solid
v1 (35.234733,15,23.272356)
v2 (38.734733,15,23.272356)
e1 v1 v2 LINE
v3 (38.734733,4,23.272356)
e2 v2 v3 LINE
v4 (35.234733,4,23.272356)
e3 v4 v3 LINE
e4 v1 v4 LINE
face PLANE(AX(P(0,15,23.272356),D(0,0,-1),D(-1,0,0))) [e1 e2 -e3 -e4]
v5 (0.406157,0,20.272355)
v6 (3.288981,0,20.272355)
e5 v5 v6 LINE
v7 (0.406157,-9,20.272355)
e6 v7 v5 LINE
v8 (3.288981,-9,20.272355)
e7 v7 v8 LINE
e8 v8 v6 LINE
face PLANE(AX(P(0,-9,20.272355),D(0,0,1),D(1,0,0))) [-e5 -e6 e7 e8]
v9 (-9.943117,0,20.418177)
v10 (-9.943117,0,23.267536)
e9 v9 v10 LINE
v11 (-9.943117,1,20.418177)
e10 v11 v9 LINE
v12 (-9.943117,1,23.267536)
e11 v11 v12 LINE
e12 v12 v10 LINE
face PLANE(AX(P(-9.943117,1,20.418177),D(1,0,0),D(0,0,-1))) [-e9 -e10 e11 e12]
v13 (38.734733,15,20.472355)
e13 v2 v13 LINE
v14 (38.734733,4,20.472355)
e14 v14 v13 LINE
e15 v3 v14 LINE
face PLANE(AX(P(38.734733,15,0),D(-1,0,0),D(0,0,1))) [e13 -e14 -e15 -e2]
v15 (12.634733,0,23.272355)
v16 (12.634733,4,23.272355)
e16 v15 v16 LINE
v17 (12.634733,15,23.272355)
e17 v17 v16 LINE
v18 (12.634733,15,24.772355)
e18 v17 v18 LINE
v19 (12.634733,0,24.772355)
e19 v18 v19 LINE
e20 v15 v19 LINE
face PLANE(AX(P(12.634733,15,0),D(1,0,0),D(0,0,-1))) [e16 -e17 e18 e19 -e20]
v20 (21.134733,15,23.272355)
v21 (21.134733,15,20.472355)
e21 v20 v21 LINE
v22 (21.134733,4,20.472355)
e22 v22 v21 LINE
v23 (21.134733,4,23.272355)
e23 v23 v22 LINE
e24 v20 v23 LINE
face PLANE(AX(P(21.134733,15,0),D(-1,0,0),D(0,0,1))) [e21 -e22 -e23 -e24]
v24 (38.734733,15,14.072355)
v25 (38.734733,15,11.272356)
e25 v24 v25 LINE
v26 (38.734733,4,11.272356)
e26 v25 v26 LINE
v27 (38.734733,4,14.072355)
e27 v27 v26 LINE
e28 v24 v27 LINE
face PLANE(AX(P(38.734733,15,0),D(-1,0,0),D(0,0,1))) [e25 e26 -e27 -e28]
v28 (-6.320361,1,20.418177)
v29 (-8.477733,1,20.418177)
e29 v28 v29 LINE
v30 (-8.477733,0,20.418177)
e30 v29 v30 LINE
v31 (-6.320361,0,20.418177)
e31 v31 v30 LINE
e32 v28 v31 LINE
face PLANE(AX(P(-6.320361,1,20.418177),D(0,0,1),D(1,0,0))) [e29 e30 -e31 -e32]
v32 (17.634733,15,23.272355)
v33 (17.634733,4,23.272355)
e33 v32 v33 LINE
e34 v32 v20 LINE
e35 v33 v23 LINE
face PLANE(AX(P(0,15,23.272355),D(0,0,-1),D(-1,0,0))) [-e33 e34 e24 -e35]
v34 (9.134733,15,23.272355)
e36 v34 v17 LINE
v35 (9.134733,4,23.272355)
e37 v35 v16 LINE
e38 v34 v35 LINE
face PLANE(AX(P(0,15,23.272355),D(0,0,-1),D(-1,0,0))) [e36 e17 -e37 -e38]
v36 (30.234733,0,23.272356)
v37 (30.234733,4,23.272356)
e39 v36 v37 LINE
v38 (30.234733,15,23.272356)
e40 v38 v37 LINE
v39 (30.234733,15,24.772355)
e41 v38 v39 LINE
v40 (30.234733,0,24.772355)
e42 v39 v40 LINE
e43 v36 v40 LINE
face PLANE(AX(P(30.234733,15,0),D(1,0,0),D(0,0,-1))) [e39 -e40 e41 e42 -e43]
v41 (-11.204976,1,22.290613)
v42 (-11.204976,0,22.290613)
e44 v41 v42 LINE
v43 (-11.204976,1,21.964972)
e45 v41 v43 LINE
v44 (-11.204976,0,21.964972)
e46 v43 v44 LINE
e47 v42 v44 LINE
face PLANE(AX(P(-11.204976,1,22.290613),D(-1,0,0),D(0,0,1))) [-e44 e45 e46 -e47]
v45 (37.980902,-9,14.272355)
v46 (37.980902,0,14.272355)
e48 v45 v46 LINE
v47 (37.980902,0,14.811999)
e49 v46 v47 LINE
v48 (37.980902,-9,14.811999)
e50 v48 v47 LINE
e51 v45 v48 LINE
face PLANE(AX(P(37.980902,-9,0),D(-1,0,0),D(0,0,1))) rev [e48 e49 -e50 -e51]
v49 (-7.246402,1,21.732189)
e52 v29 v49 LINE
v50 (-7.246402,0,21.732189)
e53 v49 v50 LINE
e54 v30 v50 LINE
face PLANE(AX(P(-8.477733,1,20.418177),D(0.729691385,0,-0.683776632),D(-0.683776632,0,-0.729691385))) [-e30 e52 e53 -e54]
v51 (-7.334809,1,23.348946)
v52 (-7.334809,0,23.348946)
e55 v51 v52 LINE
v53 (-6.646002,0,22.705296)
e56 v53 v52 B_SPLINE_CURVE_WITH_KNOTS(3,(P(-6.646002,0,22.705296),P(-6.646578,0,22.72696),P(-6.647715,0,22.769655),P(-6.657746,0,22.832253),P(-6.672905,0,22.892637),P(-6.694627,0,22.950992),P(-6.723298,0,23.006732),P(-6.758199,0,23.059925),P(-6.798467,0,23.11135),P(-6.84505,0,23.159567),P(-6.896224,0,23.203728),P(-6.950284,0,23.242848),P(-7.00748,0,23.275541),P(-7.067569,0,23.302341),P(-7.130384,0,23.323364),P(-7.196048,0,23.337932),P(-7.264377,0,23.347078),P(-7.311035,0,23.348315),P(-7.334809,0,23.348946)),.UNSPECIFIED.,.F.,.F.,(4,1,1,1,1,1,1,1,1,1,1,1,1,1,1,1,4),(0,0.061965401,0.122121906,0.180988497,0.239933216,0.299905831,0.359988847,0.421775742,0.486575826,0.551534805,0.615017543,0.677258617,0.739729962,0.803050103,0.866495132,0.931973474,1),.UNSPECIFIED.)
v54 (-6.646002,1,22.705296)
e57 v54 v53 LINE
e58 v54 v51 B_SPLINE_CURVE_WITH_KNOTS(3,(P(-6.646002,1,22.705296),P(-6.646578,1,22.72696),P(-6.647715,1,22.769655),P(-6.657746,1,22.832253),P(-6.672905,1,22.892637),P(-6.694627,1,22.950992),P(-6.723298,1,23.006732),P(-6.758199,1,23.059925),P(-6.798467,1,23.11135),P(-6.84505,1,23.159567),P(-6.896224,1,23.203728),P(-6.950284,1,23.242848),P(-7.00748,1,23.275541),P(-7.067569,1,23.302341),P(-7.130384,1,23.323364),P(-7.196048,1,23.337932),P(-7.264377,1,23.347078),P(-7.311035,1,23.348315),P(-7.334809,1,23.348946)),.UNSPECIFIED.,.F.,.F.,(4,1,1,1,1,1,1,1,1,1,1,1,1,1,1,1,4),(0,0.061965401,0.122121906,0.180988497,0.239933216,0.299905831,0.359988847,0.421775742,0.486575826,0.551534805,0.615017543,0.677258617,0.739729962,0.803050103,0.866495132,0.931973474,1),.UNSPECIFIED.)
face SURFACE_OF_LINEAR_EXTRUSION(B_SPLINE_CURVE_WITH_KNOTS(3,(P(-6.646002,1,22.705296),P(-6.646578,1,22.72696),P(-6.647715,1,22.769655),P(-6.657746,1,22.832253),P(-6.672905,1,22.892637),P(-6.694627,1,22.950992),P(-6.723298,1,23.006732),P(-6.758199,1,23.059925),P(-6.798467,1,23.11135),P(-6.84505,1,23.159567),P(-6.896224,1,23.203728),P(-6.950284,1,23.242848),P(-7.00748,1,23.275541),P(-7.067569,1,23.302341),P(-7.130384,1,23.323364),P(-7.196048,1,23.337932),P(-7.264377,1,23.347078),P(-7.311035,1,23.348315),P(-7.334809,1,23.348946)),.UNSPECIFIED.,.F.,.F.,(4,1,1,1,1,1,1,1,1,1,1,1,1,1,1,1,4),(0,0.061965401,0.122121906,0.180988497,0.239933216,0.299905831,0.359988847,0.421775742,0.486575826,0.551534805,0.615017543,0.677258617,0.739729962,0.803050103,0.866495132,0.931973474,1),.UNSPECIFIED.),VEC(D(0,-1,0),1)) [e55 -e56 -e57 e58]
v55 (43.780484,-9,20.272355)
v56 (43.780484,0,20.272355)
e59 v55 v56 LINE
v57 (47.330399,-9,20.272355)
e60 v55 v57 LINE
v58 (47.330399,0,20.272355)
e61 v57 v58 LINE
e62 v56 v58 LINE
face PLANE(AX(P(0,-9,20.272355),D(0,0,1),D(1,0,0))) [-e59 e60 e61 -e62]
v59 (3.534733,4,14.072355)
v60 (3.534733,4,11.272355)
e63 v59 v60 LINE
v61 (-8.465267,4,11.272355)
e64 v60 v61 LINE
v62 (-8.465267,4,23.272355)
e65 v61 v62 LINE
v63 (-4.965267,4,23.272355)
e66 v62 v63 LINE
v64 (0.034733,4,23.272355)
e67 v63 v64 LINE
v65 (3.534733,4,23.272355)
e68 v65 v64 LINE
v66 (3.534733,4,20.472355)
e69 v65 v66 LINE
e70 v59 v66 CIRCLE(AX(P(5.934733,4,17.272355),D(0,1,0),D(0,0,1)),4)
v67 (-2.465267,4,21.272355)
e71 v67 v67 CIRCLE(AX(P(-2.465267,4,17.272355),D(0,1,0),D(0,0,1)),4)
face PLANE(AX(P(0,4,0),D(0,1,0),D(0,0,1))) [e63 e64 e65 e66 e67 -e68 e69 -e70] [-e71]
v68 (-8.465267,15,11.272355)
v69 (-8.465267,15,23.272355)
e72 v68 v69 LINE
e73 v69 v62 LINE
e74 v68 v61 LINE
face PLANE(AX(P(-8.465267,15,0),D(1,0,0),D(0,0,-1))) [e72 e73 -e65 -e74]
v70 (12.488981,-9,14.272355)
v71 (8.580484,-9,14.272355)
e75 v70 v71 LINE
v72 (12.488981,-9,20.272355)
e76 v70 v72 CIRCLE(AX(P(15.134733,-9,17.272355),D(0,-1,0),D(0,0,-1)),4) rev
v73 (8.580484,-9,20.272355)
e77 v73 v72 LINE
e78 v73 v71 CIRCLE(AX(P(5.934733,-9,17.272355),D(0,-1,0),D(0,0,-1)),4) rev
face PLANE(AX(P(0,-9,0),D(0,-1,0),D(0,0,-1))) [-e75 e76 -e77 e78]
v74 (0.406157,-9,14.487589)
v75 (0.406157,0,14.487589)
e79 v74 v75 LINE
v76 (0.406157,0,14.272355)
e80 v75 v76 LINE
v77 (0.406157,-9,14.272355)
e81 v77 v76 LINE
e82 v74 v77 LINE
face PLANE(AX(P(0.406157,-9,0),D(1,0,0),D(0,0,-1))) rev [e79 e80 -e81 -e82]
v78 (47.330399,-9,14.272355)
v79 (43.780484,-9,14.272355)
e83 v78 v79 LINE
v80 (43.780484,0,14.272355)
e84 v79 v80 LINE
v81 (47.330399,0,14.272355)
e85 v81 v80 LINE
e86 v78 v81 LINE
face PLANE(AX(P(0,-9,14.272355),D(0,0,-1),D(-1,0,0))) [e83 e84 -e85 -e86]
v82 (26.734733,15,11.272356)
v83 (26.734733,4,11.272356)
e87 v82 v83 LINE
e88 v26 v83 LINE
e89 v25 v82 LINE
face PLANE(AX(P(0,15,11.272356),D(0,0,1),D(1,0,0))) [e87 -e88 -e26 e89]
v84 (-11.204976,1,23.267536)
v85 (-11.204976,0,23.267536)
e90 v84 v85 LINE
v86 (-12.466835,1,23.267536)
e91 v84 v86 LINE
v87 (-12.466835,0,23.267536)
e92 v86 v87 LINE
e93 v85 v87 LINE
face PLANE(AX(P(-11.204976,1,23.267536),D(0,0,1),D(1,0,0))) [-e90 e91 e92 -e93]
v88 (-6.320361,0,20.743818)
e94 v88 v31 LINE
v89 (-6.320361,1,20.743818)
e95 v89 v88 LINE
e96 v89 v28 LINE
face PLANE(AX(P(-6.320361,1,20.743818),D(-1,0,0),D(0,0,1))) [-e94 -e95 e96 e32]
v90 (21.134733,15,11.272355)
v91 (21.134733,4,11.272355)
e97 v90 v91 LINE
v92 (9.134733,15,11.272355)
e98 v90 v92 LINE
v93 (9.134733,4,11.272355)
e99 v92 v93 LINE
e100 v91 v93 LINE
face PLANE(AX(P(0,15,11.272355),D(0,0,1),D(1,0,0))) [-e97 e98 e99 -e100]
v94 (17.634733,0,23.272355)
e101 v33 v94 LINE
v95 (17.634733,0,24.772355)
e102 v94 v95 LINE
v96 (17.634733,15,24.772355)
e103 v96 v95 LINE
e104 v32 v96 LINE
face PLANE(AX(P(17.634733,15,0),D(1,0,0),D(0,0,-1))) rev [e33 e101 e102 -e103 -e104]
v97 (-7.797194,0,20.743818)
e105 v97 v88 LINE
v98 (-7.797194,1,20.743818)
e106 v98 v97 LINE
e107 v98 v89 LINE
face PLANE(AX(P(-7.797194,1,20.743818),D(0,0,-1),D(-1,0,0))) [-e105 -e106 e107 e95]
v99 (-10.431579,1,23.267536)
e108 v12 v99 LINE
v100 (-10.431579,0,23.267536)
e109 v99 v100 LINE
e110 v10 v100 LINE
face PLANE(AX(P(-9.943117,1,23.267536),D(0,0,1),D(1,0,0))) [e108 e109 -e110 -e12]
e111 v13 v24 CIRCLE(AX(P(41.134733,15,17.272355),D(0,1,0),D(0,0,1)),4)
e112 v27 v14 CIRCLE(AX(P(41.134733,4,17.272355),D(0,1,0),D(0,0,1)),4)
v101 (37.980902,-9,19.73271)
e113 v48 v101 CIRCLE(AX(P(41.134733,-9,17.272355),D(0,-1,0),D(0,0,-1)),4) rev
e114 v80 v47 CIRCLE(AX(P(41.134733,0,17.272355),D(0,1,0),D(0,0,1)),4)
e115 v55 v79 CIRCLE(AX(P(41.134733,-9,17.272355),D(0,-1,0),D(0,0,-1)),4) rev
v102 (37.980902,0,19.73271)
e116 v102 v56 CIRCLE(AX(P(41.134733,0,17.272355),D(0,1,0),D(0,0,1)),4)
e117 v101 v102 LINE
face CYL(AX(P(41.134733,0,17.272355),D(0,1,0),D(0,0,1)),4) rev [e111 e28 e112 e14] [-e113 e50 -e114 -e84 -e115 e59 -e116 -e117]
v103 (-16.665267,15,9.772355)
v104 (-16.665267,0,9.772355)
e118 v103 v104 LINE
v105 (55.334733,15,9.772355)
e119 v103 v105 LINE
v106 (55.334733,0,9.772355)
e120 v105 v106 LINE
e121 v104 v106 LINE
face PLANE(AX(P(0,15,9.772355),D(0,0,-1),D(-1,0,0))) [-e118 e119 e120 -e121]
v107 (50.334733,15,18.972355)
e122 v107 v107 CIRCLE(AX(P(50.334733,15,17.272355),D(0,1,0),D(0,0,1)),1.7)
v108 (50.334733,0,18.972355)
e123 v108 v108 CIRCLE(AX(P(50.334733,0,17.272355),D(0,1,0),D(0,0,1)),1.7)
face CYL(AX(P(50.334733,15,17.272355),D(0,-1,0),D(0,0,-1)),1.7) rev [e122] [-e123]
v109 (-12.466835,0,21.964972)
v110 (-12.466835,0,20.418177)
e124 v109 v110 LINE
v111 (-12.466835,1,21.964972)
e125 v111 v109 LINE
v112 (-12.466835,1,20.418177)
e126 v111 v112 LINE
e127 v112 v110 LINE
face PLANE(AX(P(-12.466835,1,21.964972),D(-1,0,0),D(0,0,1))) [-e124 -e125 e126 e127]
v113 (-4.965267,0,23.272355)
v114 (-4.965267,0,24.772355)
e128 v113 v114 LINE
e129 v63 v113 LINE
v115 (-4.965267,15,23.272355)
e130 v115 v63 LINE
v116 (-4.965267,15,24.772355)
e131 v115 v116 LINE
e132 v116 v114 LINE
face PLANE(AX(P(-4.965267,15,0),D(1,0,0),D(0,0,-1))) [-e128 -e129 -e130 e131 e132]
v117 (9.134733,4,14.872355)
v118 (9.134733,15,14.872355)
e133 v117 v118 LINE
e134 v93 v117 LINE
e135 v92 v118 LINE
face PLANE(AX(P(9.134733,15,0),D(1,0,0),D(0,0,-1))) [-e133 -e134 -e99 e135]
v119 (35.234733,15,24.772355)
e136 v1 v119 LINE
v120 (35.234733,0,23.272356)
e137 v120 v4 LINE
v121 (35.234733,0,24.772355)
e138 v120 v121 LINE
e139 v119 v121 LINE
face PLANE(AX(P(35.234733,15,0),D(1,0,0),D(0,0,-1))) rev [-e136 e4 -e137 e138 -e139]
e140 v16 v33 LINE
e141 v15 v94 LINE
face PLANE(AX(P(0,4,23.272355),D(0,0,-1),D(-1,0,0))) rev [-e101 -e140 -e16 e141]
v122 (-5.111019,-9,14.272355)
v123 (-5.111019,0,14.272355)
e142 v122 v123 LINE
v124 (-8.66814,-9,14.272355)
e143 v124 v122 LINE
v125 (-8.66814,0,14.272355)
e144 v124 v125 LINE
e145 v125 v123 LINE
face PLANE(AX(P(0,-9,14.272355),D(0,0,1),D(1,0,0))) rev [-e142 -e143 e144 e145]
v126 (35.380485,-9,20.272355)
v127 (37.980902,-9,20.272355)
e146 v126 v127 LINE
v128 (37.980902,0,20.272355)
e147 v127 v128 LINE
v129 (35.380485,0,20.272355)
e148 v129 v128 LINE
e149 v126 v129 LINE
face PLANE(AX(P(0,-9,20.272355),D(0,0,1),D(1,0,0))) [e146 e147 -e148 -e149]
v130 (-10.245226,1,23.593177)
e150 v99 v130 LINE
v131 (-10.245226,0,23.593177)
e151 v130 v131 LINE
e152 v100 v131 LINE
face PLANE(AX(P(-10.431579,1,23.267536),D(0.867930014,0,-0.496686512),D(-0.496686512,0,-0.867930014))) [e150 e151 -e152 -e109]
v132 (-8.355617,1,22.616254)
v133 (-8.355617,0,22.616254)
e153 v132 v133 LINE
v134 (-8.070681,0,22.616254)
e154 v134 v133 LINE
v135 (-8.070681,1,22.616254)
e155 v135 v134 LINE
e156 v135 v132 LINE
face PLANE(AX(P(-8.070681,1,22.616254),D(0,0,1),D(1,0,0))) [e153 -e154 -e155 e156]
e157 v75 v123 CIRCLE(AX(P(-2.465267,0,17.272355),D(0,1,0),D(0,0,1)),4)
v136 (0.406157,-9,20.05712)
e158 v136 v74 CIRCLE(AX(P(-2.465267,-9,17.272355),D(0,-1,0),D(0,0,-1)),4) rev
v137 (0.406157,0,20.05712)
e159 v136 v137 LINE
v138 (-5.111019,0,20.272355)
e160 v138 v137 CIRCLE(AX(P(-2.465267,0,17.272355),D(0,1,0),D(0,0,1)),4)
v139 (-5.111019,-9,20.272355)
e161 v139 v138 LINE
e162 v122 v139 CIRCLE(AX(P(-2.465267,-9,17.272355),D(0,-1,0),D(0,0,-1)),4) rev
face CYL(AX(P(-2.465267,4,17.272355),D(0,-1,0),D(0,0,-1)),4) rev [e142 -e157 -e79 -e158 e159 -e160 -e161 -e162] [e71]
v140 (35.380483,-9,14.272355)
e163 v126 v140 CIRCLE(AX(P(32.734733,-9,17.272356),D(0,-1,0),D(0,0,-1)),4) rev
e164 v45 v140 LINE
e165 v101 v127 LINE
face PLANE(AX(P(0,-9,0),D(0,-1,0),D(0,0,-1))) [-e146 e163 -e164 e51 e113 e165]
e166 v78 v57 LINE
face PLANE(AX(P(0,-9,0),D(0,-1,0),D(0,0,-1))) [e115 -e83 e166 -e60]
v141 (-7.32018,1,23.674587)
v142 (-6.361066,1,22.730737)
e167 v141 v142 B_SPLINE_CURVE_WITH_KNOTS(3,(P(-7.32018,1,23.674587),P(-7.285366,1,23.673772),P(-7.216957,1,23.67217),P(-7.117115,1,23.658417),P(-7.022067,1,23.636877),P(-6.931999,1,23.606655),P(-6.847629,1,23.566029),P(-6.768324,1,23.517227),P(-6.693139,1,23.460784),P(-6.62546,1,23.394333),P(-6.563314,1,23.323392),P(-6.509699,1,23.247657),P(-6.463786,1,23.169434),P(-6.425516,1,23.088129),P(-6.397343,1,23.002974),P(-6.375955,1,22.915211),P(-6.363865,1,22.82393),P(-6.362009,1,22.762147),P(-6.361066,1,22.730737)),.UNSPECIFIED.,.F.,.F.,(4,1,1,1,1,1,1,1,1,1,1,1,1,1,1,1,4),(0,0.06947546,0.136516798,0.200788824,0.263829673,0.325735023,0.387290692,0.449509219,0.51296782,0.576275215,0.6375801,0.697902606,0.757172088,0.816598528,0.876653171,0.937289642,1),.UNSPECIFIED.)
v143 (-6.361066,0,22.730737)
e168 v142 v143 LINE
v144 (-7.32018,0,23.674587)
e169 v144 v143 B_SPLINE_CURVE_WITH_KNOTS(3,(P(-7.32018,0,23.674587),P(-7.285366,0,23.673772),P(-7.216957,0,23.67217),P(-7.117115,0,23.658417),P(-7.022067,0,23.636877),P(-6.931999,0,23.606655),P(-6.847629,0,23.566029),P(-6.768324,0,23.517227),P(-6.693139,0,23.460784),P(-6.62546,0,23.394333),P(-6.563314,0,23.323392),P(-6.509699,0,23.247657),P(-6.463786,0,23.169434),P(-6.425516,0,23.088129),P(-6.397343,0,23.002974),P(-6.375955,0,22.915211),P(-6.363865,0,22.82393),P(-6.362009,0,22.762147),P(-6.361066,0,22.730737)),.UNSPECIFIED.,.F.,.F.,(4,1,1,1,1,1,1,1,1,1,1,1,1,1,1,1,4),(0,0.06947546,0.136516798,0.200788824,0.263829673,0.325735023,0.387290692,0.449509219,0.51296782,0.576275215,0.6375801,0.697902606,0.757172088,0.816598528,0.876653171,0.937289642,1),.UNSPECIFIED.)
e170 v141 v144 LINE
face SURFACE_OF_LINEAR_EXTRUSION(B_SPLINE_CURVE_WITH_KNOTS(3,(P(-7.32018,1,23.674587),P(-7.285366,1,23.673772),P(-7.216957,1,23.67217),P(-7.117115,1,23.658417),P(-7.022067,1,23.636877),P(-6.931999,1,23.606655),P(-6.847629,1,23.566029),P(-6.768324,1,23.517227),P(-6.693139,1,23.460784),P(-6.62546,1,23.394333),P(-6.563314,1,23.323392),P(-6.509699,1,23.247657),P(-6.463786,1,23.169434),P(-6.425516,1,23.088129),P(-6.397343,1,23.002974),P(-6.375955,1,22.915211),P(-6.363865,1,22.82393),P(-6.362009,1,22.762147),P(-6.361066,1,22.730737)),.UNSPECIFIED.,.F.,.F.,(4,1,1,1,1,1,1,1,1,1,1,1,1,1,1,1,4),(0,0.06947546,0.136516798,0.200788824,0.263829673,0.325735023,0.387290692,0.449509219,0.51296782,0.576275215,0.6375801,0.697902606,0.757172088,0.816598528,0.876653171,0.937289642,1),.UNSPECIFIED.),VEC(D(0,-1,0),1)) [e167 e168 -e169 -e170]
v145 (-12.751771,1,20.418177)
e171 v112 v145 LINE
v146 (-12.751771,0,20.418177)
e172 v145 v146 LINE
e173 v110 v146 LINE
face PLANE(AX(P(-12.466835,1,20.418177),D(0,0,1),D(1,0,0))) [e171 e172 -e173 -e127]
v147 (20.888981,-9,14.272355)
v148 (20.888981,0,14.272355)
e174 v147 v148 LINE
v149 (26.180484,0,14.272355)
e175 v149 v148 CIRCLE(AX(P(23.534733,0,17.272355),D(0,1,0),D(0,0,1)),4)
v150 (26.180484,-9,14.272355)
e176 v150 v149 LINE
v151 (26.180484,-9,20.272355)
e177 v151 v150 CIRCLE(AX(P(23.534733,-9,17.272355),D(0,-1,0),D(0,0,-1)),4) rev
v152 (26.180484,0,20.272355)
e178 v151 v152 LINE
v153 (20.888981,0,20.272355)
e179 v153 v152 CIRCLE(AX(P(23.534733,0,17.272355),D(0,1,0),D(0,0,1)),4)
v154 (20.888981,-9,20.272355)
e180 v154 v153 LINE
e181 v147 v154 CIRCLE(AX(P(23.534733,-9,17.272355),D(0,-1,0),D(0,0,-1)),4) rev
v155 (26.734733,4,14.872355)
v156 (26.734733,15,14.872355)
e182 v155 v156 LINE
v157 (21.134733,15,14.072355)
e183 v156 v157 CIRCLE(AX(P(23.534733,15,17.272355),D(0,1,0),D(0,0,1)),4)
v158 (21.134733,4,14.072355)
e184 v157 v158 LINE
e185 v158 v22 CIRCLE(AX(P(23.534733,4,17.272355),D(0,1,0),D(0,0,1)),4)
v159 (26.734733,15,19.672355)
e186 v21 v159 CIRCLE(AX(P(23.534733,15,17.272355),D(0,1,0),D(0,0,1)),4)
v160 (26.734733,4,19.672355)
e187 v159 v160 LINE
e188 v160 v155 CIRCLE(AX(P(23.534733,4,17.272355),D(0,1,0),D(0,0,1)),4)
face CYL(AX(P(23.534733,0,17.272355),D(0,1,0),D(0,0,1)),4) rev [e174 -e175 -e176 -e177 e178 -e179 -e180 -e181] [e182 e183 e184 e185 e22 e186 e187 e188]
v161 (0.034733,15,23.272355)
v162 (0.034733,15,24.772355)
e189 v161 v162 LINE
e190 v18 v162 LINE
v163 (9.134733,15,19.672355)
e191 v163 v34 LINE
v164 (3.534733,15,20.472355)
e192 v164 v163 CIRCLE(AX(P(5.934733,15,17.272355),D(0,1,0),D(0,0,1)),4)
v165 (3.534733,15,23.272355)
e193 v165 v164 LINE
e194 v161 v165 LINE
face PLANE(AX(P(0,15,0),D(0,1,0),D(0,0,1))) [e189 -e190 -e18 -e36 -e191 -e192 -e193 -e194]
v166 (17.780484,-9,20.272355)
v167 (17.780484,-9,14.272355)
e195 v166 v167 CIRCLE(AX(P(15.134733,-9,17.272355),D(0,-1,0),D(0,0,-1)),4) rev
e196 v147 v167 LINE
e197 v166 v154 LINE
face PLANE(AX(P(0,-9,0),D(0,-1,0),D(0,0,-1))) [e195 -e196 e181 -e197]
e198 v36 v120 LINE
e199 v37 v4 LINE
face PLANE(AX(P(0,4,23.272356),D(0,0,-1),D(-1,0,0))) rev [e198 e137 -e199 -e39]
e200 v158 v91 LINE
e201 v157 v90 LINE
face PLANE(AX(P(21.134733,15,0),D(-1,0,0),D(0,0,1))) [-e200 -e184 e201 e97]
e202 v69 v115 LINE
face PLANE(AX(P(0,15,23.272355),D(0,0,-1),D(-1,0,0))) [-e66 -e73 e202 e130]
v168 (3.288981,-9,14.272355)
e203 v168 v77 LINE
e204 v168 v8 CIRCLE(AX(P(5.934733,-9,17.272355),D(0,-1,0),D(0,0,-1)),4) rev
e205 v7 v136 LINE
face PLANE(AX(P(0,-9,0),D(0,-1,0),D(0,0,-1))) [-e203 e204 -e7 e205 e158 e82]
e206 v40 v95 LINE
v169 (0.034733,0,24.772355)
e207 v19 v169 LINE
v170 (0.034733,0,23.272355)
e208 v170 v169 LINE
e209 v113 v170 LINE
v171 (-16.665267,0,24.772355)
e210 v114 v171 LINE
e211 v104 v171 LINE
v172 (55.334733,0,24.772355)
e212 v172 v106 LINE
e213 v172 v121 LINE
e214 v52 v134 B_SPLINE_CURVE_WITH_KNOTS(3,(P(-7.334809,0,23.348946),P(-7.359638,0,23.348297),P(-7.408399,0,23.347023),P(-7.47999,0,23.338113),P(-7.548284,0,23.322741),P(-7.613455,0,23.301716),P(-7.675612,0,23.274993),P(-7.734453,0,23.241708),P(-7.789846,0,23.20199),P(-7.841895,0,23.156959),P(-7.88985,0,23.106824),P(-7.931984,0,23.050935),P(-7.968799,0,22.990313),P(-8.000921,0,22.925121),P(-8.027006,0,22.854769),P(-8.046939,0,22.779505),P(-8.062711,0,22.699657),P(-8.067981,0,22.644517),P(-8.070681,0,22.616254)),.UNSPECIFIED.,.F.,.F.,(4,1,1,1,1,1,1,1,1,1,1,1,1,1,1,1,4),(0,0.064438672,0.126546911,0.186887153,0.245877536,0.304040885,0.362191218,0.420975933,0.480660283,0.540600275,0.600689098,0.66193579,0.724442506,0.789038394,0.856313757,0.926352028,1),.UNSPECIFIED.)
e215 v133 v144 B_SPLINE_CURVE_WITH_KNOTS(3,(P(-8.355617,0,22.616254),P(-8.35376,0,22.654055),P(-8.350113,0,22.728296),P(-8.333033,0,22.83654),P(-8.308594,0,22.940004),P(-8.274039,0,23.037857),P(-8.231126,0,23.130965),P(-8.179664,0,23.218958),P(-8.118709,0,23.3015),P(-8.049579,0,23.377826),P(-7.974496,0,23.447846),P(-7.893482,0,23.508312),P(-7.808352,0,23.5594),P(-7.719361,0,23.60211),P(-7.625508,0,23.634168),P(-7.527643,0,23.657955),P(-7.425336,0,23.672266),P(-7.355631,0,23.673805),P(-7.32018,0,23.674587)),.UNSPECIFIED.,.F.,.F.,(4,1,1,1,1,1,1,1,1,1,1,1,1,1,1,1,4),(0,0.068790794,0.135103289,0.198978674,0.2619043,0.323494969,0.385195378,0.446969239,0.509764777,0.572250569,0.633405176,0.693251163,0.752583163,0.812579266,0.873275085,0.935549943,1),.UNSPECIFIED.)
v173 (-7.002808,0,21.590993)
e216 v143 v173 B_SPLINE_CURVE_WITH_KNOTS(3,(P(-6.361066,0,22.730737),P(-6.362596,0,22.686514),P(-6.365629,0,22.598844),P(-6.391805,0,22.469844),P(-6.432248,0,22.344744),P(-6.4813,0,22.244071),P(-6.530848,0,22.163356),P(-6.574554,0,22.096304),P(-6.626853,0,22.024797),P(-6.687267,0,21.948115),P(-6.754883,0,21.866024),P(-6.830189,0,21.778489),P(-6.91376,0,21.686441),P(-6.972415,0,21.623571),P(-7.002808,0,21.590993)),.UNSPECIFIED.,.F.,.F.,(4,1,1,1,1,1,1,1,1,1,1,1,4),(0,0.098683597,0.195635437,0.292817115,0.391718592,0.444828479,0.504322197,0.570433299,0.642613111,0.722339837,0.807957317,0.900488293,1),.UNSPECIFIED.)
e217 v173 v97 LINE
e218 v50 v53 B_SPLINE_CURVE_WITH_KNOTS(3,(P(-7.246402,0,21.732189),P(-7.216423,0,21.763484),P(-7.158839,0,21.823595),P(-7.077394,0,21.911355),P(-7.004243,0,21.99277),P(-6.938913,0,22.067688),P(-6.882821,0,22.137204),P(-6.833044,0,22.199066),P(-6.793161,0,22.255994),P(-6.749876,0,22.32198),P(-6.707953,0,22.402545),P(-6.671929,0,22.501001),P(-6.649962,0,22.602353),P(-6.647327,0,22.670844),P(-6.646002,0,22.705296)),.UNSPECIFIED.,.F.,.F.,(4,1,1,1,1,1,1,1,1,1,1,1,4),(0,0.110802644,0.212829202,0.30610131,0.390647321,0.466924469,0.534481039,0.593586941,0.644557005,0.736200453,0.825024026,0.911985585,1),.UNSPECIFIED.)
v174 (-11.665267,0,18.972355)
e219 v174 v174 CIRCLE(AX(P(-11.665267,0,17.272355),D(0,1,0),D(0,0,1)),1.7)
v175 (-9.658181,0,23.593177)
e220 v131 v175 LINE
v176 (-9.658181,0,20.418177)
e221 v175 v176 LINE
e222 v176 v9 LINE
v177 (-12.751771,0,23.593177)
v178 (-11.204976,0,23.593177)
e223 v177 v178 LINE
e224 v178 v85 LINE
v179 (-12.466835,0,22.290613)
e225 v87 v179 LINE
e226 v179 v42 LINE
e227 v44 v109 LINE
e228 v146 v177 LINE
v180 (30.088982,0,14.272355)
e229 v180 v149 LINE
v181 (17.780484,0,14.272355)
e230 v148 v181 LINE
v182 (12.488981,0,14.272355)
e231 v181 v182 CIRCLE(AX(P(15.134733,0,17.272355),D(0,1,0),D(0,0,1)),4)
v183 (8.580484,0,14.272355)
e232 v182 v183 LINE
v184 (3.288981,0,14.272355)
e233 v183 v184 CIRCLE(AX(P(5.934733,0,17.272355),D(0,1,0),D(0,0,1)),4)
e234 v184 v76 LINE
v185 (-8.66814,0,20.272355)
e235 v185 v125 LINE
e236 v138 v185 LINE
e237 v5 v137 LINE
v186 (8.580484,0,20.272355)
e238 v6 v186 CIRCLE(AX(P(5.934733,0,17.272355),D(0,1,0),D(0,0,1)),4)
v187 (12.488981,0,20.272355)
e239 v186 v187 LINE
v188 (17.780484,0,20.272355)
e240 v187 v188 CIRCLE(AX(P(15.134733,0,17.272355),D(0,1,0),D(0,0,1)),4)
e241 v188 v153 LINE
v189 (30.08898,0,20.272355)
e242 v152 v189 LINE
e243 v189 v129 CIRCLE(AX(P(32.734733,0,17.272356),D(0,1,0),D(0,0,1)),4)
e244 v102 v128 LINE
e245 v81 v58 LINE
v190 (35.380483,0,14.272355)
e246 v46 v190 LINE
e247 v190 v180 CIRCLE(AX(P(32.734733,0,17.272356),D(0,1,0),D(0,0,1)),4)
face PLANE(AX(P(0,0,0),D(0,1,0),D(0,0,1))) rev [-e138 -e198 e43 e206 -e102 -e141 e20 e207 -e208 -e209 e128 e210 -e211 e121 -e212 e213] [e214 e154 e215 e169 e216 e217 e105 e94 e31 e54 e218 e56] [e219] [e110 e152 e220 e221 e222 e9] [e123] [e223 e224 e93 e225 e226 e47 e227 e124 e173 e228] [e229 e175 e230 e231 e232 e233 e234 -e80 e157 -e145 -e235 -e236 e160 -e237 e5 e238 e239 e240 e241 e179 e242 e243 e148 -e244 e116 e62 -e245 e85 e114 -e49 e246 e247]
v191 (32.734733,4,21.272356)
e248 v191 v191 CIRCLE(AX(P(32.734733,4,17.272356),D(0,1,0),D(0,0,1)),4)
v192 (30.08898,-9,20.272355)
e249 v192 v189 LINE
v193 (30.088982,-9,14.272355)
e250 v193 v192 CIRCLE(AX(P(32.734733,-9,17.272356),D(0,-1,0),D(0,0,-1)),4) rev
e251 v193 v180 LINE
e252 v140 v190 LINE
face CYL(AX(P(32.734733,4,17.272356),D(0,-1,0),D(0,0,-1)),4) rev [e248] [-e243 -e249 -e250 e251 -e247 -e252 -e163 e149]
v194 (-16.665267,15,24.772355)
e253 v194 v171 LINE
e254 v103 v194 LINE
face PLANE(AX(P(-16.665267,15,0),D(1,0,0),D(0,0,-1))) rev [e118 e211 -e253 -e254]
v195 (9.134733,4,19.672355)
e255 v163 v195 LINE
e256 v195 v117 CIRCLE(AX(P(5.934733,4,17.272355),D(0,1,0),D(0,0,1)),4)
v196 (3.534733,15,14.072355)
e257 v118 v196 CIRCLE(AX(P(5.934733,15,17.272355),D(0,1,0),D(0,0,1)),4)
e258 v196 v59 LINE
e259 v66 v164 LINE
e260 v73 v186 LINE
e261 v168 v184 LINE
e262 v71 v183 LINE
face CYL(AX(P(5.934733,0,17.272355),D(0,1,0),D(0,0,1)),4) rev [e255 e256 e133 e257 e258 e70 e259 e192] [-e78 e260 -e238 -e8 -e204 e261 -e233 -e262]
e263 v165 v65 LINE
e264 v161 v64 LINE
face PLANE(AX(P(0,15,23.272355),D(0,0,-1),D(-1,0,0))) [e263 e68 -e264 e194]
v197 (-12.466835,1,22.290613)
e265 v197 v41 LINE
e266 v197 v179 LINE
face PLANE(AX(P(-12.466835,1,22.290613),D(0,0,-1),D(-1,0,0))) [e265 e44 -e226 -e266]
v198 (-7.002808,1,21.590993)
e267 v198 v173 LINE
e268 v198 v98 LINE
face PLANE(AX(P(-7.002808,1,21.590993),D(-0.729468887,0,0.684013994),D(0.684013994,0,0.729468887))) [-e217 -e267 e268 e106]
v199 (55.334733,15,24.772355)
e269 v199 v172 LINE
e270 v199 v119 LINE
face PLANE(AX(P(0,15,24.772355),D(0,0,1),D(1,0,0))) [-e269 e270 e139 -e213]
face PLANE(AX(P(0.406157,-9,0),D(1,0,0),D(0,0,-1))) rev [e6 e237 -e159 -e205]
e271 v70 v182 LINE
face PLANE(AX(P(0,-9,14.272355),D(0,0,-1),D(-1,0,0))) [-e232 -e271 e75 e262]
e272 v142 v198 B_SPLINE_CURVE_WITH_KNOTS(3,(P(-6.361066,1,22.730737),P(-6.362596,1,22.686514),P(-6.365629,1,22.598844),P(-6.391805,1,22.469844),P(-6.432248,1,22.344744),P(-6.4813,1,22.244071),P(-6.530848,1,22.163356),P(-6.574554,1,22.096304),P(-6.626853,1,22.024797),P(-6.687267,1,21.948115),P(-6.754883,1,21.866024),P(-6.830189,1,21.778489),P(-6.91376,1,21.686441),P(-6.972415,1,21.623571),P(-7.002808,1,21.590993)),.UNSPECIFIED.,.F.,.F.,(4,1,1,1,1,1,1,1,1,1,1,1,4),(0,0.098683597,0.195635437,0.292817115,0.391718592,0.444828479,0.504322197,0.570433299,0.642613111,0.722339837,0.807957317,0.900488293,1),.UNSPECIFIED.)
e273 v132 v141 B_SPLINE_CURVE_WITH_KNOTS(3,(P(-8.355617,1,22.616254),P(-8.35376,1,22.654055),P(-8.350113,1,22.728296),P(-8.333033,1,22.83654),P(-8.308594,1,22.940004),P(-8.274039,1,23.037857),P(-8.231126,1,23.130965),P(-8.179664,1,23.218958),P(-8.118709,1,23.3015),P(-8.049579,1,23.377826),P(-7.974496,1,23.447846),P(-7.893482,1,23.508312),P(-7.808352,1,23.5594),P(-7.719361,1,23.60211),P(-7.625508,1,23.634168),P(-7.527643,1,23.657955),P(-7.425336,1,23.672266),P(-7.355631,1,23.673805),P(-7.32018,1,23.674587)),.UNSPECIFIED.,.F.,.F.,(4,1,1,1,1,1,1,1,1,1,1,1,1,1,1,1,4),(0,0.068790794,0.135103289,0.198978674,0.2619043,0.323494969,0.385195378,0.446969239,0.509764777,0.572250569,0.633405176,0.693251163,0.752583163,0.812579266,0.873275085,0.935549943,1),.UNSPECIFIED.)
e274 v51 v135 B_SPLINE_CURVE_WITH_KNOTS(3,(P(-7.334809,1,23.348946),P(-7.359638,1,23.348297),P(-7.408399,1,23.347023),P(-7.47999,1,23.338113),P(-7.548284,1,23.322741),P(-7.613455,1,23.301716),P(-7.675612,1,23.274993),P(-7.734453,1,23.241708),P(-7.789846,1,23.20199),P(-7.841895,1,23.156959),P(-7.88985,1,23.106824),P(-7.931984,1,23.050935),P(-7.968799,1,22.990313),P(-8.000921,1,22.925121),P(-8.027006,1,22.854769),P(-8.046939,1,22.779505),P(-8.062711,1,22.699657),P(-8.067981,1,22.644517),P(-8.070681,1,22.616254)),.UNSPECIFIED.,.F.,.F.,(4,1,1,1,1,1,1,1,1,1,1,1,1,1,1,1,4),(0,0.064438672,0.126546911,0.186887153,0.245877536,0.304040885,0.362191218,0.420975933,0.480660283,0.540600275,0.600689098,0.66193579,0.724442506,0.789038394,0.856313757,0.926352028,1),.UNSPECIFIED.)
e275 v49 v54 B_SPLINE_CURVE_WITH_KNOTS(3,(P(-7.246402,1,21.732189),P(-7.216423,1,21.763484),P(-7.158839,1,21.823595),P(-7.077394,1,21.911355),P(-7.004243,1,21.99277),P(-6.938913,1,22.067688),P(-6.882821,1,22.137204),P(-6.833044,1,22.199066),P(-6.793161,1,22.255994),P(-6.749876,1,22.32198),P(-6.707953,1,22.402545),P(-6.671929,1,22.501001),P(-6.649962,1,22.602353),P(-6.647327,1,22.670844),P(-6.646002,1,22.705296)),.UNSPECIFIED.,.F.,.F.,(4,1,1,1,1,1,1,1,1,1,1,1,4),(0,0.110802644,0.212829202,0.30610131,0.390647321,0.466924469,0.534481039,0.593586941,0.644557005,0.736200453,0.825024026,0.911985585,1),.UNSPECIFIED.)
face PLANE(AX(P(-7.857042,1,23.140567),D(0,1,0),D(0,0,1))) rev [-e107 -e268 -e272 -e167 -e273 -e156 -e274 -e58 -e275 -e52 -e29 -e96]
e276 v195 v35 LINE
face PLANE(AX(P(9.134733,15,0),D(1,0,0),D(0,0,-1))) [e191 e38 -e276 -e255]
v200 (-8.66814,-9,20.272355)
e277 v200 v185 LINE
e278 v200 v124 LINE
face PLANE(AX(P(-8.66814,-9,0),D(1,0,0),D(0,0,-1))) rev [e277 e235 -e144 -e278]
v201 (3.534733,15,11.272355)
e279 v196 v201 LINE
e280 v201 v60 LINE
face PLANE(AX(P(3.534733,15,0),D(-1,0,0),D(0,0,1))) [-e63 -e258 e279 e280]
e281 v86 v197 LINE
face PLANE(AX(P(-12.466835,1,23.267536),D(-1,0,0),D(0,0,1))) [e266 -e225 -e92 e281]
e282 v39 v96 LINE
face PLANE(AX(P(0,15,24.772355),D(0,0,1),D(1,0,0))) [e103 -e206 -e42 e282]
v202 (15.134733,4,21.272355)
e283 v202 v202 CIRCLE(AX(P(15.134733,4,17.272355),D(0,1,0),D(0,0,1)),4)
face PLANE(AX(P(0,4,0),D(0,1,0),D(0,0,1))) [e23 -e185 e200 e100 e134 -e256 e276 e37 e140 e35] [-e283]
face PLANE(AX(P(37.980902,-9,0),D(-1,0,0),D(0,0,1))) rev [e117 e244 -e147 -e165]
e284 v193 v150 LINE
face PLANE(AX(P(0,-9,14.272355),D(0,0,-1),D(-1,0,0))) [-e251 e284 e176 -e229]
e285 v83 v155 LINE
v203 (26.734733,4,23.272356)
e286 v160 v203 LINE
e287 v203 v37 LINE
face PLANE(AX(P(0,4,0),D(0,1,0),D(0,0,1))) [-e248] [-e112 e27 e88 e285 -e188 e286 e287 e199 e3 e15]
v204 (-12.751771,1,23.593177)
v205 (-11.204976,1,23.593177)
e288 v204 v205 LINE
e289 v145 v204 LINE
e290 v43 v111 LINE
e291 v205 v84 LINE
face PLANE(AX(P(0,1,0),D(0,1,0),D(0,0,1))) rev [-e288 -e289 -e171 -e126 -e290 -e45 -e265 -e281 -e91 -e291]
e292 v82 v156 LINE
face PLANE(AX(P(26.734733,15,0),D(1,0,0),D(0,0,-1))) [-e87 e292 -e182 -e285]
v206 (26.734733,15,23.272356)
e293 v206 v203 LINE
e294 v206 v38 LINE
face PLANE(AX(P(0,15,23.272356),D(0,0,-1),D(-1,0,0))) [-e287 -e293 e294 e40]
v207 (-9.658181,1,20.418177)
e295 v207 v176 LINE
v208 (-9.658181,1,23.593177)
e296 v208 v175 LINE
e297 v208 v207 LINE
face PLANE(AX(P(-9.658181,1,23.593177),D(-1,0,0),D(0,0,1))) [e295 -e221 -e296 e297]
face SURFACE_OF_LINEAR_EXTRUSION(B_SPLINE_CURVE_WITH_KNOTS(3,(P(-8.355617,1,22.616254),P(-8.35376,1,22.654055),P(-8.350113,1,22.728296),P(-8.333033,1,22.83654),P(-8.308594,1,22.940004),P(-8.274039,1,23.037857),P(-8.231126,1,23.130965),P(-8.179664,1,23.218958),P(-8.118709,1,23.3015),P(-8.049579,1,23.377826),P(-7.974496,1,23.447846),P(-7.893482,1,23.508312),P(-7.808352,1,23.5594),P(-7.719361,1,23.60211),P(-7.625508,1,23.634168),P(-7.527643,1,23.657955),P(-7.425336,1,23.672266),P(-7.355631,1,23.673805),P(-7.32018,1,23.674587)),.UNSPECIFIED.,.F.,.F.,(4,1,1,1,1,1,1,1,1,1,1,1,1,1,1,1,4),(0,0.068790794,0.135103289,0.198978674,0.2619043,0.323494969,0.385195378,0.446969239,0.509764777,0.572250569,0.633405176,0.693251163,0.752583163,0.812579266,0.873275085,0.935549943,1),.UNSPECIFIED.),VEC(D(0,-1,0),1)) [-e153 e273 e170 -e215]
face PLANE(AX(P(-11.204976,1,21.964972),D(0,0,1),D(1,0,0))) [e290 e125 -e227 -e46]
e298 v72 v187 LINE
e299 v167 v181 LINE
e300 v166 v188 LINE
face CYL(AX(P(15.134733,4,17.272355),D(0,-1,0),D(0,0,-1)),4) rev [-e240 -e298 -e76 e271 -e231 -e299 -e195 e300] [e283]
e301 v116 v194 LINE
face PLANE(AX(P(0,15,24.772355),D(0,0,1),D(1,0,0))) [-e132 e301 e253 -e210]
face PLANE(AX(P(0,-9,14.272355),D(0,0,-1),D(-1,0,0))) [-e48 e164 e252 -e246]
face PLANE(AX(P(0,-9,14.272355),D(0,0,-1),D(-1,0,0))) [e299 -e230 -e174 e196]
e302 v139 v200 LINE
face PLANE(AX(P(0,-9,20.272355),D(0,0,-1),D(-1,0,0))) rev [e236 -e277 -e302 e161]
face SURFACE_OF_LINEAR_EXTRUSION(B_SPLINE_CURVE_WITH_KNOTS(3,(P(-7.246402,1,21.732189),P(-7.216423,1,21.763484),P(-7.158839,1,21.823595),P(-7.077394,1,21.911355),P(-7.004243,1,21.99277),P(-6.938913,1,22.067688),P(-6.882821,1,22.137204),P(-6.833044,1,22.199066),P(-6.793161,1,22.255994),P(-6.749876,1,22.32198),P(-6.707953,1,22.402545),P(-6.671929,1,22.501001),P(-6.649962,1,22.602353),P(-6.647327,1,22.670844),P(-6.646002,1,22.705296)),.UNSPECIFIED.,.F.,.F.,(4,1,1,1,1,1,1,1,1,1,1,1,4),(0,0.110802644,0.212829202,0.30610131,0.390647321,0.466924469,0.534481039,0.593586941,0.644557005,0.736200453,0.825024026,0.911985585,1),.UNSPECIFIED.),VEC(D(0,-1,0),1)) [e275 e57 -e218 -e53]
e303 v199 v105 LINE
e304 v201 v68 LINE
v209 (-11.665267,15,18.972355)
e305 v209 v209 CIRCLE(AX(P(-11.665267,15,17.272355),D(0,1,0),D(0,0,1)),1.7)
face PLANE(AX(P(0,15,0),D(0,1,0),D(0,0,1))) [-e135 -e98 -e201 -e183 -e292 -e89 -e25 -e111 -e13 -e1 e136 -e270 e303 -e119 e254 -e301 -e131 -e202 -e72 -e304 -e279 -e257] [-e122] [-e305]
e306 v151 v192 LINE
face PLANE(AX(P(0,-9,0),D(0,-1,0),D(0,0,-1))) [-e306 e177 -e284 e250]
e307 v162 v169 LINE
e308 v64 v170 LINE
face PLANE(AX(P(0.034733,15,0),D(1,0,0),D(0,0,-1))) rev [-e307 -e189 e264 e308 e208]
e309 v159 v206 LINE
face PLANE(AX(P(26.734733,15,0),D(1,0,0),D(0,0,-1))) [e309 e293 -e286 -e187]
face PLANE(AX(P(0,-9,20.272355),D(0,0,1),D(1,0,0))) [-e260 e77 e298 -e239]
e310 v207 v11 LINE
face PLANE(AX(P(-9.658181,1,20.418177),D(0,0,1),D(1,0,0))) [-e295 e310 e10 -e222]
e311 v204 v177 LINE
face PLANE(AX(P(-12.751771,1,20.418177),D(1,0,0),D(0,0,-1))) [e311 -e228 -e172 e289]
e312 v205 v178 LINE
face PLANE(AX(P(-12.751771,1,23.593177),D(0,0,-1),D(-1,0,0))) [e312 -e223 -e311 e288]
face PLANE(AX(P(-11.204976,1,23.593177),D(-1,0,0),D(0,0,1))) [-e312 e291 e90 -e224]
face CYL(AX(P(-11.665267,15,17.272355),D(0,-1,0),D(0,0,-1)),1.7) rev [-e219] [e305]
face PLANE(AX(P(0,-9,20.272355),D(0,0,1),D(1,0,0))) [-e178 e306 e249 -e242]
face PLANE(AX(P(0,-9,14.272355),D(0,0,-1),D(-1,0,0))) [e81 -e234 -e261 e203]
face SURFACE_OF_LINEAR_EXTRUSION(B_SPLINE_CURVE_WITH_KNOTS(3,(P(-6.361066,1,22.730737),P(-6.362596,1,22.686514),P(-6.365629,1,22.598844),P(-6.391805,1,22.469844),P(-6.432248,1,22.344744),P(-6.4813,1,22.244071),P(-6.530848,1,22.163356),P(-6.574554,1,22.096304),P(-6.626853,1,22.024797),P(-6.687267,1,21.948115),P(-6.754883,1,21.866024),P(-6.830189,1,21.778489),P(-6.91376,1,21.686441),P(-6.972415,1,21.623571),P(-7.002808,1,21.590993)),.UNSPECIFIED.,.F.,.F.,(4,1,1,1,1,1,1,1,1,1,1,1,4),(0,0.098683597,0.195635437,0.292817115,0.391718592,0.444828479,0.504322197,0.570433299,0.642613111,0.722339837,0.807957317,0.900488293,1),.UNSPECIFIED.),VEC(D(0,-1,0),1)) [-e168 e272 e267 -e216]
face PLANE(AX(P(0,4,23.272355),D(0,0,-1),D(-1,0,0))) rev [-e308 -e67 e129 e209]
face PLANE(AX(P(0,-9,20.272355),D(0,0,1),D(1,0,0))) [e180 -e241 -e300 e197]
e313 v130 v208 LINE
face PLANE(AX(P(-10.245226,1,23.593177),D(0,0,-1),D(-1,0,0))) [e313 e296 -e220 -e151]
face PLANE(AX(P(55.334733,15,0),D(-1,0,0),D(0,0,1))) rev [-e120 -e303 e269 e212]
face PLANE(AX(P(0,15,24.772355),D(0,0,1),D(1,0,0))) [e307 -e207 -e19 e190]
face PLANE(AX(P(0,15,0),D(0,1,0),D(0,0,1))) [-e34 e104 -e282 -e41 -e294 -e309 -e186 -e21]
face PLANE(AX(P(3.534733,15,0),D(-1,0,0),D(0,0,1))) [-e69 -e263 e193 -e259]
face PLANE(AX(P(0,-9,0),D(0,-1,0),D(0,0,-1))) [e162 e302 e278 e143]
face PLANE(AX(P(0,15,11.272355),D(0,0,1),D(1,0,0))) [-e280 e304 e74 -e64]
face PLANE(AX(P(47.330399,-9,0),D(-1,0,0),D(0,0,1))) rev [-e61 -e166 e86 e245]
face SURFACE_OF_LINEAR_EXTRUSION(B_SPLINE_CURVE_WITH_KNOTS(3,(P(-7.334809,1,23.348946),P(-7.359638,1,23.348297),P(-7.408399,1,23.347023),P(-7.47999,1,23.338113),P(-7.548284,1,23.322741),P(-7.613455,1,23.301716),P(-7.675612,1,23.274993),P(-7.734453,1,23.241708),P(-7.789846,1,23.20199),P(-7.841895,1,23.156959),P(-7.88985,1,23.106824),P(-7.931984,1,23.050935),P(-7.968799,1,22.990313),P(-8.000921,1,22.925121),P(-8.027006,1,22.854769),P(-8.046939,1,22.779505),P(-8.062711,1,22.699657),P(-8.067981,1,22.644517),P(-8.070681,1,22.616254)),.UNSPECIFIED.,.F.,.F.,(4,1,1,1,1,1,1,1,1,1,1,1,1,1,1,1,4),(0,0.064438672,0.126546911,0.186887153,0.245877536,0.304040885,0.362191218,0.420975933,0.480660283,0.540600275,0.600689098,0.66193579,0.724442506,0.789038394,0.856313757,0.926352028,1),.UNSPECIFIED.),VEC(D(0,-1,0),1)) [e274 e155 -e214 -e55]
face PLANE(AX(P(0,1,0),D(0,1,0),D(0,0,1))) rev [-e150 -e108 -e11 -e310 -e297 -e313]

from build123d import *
from build123d.topology import SkipClean

# Parameters (mm, degrees)
SKETCH1_W             = 12
SKETCH1_H             = 12
SKETCH1_R             = 4
BOSS_EXTRUDE1_DEPTH   = 4
BOSS_EXTRUDE1_2_DEPTH = 4
BOSS_EXTRUDE1_3_DEPTH = 4
SKETCH1_3_R           = 1.7
BOSS_EXTRUDE2_DEPTH   = 15
SKETCH4_R             = 4
CUT_EXTRUDE1_DEPTH    = 63.454801186
CUT_EXTRUDE2_DEPTH    = 1
BOSS_EXTRUDE4_DEPTH   = 9


with BuildPart() as part:
    # Sketch1 → Boss-Extrude1 (new body)
    with BuildSketch(Plane(origin=(0, 0, 0), x_dir=(1, 0, 0), z_dir=(0, 1, 0))):
        with Locations((32.734732638, -17.272355561)):
            Rectangle(SKETCH1_W, SKETCH1_H)
        with Locations((32.734732638, -17.272355561)):
            Circle(SKETCH1_R, mode=Mode.SUBTRACT)
    extrude(amount=BOSS_EXTRUDE1_DEPTH)



with BuildPart() as body_2:
    # Sketch1 → Boss-Extrude1 2 (new body)
    with BuildSketch(Plane(origin=(0, 0, 0), x_dir=(1, 0, 0), z_dir=(0, 1, 0))):
        with Locations((15.134732638, -17.272354652)):
            Rectangle(SKETCH1_W, SKETCH1_H)
        with Locations((15.134732638, -17.272354652)):
            Circle(SKETCH1_R, mode=Mode.SUBTRACT)
    extrude(amount=BOSS_EXTRUDE1_2_DEPTH)


with BuildPart() as body_3:
    # Sketch1 → Boss-Extrude1 3 (new body)
    with BuildSketch(Plane(origin=(0, 0, 0), x_dir=(1, 0, 0), z_dir=(0, 1, 0))):
        with Locations((-2.465267362, -17.272354652)):
            Rectangle(SKETCH1_W, SKETCH1_H)
        with Locations((-2.465267362, -17.272354652)):
            Circle(SKETCH1_R, mode=Mode.SUBTRACT)
    extrude(amount=BOSS_EXTRUDE1_3_DEPTH)


with BuildPart() as part_1:
    add(part.part)

    add(body_2.part)  # Boss-Extrude2 merges body 2

    add(body_3.part)  # Boss-Extrude2 merges body 3
    # Sketch1<3> → Boss-Extrude2 (add)
    with BuildSketch(Plane(origin=(0, 0, 0), x_dir=(1, 0, 0), z_dir=(0, 1, 0))):
        Polygon((35.234732638, -24.772354652), (55.334732638, -24.772354652), (55.334732638, -9.772354652), (-16.665267362, -9.772354652), (-16.665267362, -24.772354652), (-4.965267362, -24.772354652), (-4.965267362, -23.272354652), (-8.465267362, -23.272354652), (-8.465267362, -11.272354652), (3.534732638, -11.272354652), (3.534732638, -23.272354652), (0.034732638, -23.272354652), (0.034732638, -24.772354652), (12.634732638, -24.772354652), (12.634732638, -23.272354652), (9.134732638, -23.272354652), (9.134732638, -11.272354652), (21.134732638, -11.272354652), (21.134732638, -23.272354652), (17.634732638, -23.272354652), (17.634732638, -24.772354652), (30.234732638, -24.772354652), (30.234732638, -23.272355561), (26.734732638, -23.272355561), (26.734732638, -11.272355561), (38.734732638, -11.272355561), (38.734732638, -23.272355561), (35.234732638, -23.272355561), align=None)
        with Locations((-11.665267362, -17.272354652)):
            Circle(SKETCH1_3_R, mode=Mode.SUBTRACT)
        with Locations((50.334732638, -17.272354652)):
            Circle(SKETCH1_3_R, mode=Mode.SUBTRACT)
    extrude(amount=BOSS_EXTRUDE2_DEPTH)

    # Sketch4 → Cut-Extrude1 (cut, through all)
    with BuildSketch(Plane(origin=(0, 15, 0), x_dir=(1, 0, 0), z_dir=(0, 1, 0))):
        with Locations((5.934732638, -17.272354652)):
            Circle(SKETCH4_R)
        with Locations((23.534732638, -17.272354652)):
            Circle(SKETCH4_R)
        with Locations((41.134732638, -17.272354652)):
            Circle(SKETCH4_R)
    extrude(amount=-CUT_EXTRUDE1_DEPTH, mode=Mode.SUBTRACT)

    # Sketch3 → Cut-Extrude2 (cut)
    with BuildSketch(Plane.XZ):
        Polygon((-12.75177101, 23.593176671), (-11.204976138, 23.593176671), (-11.204976138, 23.267535646), (-12.466835112, 23.267535646), (-12.466835112, 22.290612569), (-11.204976138, 22.290612569), (-11.204976138, 21.964971543), (-12.466835112, 21.964971543), (-12.466835112, 20.418176671), (-12.75177101, 20.418176671), align=None)
        Polygon((-10.245225537, 23.593176671), (-9.658181266, 23.593176671), (-9.658181266, 20.418176671), (-9.943117163, 20.418176671), (-9.943117163, 23.267535646), (-10.431578702, 23.267535646), align=None)
        with BuildLine():
            Line((-8.070681266, 22.616253594), (-8.355617163, 22.616253594))
            add(Edge.make_bspline(
                [(-8.355617163, 22.616253594), (-8.353760103, 22.654055042), (-8.350112886, 22.728296081), (-8.333032938, 22.83653991), (-8.308593714, 22.940003906), (-8.274039323, 23.037857328), (-8.231125771, 23.130965389), (-8.179663532, 23.21895826), (-8.118709111, 23.301500267), (-8.049578716, 23.377826218), (-7.974495737, 23.447846371), (-7.893482492, 23.508312199), (-7.808351645, 23.559400372), (-7.719361476, 23.602109784), (-7.625507965, 23.634168073), (-7.527642801, 23.657954846), (-7.425336013, 23.672266246), (-7.355631136, 23.673804565), (-7.320180465, 23.674586928)],
                knots=[0, 0, 0, 0, 1.10065271, 2.161652631, 3.183658789, 4.190468796, 5.17591951, 6.163126047, 7.15150782, 8.156236427, 9.156009102, 10.134482811, 11.092018607, 12.041330605, 13.001268258, 13.972401359, 14.968799086, 16, 16, 16, 16], degree=3))
            add(Edge.make_bspline(
                [(-7.320180465, 23.674586928), (-7.285366069, 23.673771899), (-7.216957025, 23.672170398), (-7.117115055, 23.658417178), (-7.02206708, 23.636876534), (-6.931998892, 23.606654693), (-6.847629105, 23.566028819), (-6.768323915, 23.517226766), (-6.693139179, 23.460784491), (-6.625460168, 23.394332817), (-6.563313553, 23.323392082), (-6.509699365, 23.247656627), (-6.463785995, 23.169434346), (-6.425515743, 23.088128764), (-6.397343388, 23.002974331), (-6.375954585, 22.915210797), (-6.363864717, 22.823929718), (-6.362009226, 22.762147343), (-6.361065881, 22.730736767)],
                knots=[0, 0, 0, 0, 1.111607364, 2.184268762, 3.212621178, 4.221274766, 5.211760367, 6.196651075, 7.1921475, 8.207485113, 9.220403448, 10.201281604, 11.166441695, 12.114753415, 13.065576456, 14.026450734, 14.996634279, 16, 16, 16, 16], degree=3))
            add(Edge.make_bspline(
                [(-6.361065881, 22.730736767), (-6.362595909, 22.686513726), (-6.365629115, 22.598843695), (-6.39180536, 22.469844028), (-6.432247691, 22.344744439), (-6.481299653, 22.244070584), (-6.530848311, 22.163355831), (-6.574554268, 22.096303785), (-6.626853188, 22.024796965), (-6.687266556, 21.948115173), (-6.754882994, 21.866023852), (-6.830189157, 21.778489314), (-6.913760319, 21.686441251), (-6.972414527, 21.623570978), (-7.002807668, 21.590993178)],
                knots=[0, 0, 0, 0, 1.184203166, 2.347625244, 3.513805382, 4.700623107, 5.337941753, 6.051866363, 6.845199593, 7.711357327, 8.668078039, 9.695487809, 10.805859518, 12, 12, 12, 12], degree=3))
            Line((-7.002807668, 21.590993178), (-7.797193686, 20.743817697))
            Line((-7.797193686, 20.743817697), (-6.320360753, 20.743817697))
            Line((-6.320360753, 20.743817697), (-6.320360753, 20.418176671))
            Line((-6.320360753, 20.418176671), (-8.477732548, 20.418176671))
            Line((-8.477732548, 20.418176671), (-7.24640242, 21.732189091))
            add(Edge.make_bspline(
                [(-7.24640242, 21.732189091), (-7.216423265, 21.763483983), (-7.158839445, 21.823595067), (-7.077393822, 21.911354752), (-7.004242739, 21.992770407), (-6.938912676, 22.067688205), (-6.882820853, 22.137203984), (-6.8330439, 22.199066322), (-6.793160828, 22.255993574), (-6.749876148, 22.321979702), (-6.707953465, 22.402545161), (-6.671928685, 22.501000722), (-6.649962358, 22.602353301), (-6.647327257, 22.670844435), (-6.646001779, 22.705296062)],
                knots=[0, 0, 0, 0, 1.329631726, 2.553950428, 3.673215718, 4.687767853, 5.603093632, 6.413772471, 7.123043292, 7.734684054, 8.834405432, 9.900288307, 10.943827018, 12, 12, 12, 12], degree=3))
            add(Edge.make_bspline(
                [(-6.646001779, 22.705296062), (-6.646578488, 22.726959902), (-6.647715071, 22.769655171), (-6.657745982, 22.832253252), (-6.672904798, 22.892637048), (-6.694626568, 22.950992295), (-6.723298397, 23.006732279), (-6.758199248, 23.059924851), (-6.798467377, 23.11134984), (-6.845050314, 23.159567475), (-6.896223622, 23.203728283), (-6.95028412, 23.242847989), (-7.007479571, 23.275540611), (-7.067568825, 23.302340783), (-7.130384358, 23.323364165), (-7.196047662, 23.337931591), (-7.264377306, 23.347077844), (-7.311034834, 23.348315343), (-7.33480887, 23.348945902)],
                knots=[0, 0, 0, 0, 0.991446411, 1.95395049, 2.89581595, 3.838931463, 4.798493298, 5.75982156, 6.748411868, 7.785213223, 8.824556874, 9.840280684, 10.836137867, 11.835679398, 12.848801643, 13.863922112, 14.911575587, 16, 16, 16, 16], degree=3))
            add(Edge.make_bspline(
                [(-7.33480887, 23.348945902), (-7.359638126, 23.348297266), (-7.408398684, 23.347023451), (-7.479989521, 23.338112891), (-7.548284476, 23.322740593), (-7.613455345, 23.301716039), (-7.675612398, 23.274992926), (-7.734453352, 23.241708272), (-7.789846116, 23.201990389), (-7.841894819, 23.156959313), (-7.88985, 23.106823704), (-7.931983952, 23.050934666), (-7.96879945, 22.990312653), (-8.000920684, 22.925121239), (-8.027006203, 22.854768882), (-8.046938989, 22.779505321), (-8.062711343, 22.699657354), (-8.067980501, 22.644516598), (-8.070681266, 22.616253594)],
                knots=[0, 0, 0, 0, 1.031018746, 2.02475058, 2.990194455, 3.934040569, 4.864654155, 5.795059489, 6.735614925, 7.690564532, 8.649604399, 9.611025574, 10.590972636, 11.591080095, 12.624614302, 13.701020113, 14.821632451, 16, 16, 16, 16], degree=3))
        make_face()
    extrude(amount=-CUT_EXTRUDE2_DEPTH, mode=Mode.SUBTRACT)

    # Sketch5 → Boss-Extrude4 (add)
    with SkipClean():  # the faces are left unmerged after this step: merging them gives an invalid solid
        with BuildSketch(Plane.XZ):
            with BuildLine():
                ThreePointArc((0.406157251, 20.057120476), (1.534732638, 17.272354652), (0.406157251, 14.487588828))
                Line((0.406157251, 14.487588828), (0.406157251, 14.272354652))
                Line((0.406157251, 14.272354652), (3.288981327, 14.272354652))
                ThreePointArc((3.288981327, 14.272354652), (1.934732638, 17.272354652), (3.288981327, 20.272354652))
                Line((3.288981327, 20.272354652), (0.406157251, 20.272354652))
                Line((0.406157251, 20.272354652), (0.406157251, 20.057120476))
            make_face()
            with BuildLine():
                Line((-8.668139711, 14.272354652), (-5.111018673, 14.272354652))
                ThreePointArc((-5.111018673, 14.272354652), (-6.465267362, 17.272354652), (-5.111018673, 20.272354652))
                Line((-5.111018673, 20.272354652), (-8.668139711, 20.272354652))
                Line((-8.668139711, 20.272354652), (-8.668139711, 14.272354652))
            make_face()
            with BuildLine():
                ThreePointArc((8.580483949, 20.272354652), (9.934732638, 17.272354652), (8.580483949, 14.272354652))
                Line((8.580483949, 14.272354652), (12.488981327, 14.272354652))
                ThreePointArc((12.488981327, 14.272354652), (11.134732638, 17.272354652), (12.488981327, 20.272354652))
                Line((12.488981327, 20.272354652), (8.580483949, 20.272354652))
            make_face()
            with BuildLine():
                ThreePointArc((17.780483949, 20.272354652), (19.134732638, 17.272354652), (17.780483949, 14.272354652))
                Line((17.780483949, 14.272354652), (20.888981327, 14.272354652))
                ThreePointArc((20.888981327, 14.272354652), (19.534732638, 17.272354652), (20.888981327, 20.272354652))
                Line((20.888981327, 20.272354652), (17.780483949, 20.272354652))
            make_face()
            with BuildLine():
                ThreePointArc((26.180483949, 20.272354652), (27.534732638, 17.272354652), (26.180483949, 14.272354652))
                Line((26.180483949, 14.272354652), (30.088982357, 14.272354652))
                ThreePointArc((30.088982357, 14.272354652), (28.734732638, 17.272354187), (30.088980297, 20.272354652))
                Line((30.088980297, 20.272354652), (26.180483949, 20.272354652))
            make_face()
            with BuildLine():
                ThreePointArc((35.380484979, 20.272354652), (36.734732638, 17.272354187), (35.380482919, 14.272354652))
                Line((35.380482919, 14.272354652), (37.980901679, 14.272354652))
                Line((37.980901679, 14.272354652), (37.980901679, 14.81199893))
                ThreePointArc((37.980901679, 14.81199893), (37.134732638, 17.272354652), (37.980901679, 19.732710374))
                Line((37.980901679, 19.732710374), (37.980901679, 20.272354652))
                Line((37.980901679, 20.272354652), (35.380484979, 20.272354652))
            make_face()
            with BuildLine():
                ThreePointArc((43.780483949, 20.272354652), (45.134732638, 17.272354652), (43.780483949, 14.272354652))
                Line((43.780483949, 14.272354652), (47.330399458, 14.272354652))
                Line((47.330399458, 14.272354652), (47.330399458, 20.272354652))
                Line((47.330399458, 20.272354652), (43.780483949, 20.272354652))
            make_face()
        extrude(amount=BOSS_EXTRUDE4_DEPTH)


solid = part_1.part
